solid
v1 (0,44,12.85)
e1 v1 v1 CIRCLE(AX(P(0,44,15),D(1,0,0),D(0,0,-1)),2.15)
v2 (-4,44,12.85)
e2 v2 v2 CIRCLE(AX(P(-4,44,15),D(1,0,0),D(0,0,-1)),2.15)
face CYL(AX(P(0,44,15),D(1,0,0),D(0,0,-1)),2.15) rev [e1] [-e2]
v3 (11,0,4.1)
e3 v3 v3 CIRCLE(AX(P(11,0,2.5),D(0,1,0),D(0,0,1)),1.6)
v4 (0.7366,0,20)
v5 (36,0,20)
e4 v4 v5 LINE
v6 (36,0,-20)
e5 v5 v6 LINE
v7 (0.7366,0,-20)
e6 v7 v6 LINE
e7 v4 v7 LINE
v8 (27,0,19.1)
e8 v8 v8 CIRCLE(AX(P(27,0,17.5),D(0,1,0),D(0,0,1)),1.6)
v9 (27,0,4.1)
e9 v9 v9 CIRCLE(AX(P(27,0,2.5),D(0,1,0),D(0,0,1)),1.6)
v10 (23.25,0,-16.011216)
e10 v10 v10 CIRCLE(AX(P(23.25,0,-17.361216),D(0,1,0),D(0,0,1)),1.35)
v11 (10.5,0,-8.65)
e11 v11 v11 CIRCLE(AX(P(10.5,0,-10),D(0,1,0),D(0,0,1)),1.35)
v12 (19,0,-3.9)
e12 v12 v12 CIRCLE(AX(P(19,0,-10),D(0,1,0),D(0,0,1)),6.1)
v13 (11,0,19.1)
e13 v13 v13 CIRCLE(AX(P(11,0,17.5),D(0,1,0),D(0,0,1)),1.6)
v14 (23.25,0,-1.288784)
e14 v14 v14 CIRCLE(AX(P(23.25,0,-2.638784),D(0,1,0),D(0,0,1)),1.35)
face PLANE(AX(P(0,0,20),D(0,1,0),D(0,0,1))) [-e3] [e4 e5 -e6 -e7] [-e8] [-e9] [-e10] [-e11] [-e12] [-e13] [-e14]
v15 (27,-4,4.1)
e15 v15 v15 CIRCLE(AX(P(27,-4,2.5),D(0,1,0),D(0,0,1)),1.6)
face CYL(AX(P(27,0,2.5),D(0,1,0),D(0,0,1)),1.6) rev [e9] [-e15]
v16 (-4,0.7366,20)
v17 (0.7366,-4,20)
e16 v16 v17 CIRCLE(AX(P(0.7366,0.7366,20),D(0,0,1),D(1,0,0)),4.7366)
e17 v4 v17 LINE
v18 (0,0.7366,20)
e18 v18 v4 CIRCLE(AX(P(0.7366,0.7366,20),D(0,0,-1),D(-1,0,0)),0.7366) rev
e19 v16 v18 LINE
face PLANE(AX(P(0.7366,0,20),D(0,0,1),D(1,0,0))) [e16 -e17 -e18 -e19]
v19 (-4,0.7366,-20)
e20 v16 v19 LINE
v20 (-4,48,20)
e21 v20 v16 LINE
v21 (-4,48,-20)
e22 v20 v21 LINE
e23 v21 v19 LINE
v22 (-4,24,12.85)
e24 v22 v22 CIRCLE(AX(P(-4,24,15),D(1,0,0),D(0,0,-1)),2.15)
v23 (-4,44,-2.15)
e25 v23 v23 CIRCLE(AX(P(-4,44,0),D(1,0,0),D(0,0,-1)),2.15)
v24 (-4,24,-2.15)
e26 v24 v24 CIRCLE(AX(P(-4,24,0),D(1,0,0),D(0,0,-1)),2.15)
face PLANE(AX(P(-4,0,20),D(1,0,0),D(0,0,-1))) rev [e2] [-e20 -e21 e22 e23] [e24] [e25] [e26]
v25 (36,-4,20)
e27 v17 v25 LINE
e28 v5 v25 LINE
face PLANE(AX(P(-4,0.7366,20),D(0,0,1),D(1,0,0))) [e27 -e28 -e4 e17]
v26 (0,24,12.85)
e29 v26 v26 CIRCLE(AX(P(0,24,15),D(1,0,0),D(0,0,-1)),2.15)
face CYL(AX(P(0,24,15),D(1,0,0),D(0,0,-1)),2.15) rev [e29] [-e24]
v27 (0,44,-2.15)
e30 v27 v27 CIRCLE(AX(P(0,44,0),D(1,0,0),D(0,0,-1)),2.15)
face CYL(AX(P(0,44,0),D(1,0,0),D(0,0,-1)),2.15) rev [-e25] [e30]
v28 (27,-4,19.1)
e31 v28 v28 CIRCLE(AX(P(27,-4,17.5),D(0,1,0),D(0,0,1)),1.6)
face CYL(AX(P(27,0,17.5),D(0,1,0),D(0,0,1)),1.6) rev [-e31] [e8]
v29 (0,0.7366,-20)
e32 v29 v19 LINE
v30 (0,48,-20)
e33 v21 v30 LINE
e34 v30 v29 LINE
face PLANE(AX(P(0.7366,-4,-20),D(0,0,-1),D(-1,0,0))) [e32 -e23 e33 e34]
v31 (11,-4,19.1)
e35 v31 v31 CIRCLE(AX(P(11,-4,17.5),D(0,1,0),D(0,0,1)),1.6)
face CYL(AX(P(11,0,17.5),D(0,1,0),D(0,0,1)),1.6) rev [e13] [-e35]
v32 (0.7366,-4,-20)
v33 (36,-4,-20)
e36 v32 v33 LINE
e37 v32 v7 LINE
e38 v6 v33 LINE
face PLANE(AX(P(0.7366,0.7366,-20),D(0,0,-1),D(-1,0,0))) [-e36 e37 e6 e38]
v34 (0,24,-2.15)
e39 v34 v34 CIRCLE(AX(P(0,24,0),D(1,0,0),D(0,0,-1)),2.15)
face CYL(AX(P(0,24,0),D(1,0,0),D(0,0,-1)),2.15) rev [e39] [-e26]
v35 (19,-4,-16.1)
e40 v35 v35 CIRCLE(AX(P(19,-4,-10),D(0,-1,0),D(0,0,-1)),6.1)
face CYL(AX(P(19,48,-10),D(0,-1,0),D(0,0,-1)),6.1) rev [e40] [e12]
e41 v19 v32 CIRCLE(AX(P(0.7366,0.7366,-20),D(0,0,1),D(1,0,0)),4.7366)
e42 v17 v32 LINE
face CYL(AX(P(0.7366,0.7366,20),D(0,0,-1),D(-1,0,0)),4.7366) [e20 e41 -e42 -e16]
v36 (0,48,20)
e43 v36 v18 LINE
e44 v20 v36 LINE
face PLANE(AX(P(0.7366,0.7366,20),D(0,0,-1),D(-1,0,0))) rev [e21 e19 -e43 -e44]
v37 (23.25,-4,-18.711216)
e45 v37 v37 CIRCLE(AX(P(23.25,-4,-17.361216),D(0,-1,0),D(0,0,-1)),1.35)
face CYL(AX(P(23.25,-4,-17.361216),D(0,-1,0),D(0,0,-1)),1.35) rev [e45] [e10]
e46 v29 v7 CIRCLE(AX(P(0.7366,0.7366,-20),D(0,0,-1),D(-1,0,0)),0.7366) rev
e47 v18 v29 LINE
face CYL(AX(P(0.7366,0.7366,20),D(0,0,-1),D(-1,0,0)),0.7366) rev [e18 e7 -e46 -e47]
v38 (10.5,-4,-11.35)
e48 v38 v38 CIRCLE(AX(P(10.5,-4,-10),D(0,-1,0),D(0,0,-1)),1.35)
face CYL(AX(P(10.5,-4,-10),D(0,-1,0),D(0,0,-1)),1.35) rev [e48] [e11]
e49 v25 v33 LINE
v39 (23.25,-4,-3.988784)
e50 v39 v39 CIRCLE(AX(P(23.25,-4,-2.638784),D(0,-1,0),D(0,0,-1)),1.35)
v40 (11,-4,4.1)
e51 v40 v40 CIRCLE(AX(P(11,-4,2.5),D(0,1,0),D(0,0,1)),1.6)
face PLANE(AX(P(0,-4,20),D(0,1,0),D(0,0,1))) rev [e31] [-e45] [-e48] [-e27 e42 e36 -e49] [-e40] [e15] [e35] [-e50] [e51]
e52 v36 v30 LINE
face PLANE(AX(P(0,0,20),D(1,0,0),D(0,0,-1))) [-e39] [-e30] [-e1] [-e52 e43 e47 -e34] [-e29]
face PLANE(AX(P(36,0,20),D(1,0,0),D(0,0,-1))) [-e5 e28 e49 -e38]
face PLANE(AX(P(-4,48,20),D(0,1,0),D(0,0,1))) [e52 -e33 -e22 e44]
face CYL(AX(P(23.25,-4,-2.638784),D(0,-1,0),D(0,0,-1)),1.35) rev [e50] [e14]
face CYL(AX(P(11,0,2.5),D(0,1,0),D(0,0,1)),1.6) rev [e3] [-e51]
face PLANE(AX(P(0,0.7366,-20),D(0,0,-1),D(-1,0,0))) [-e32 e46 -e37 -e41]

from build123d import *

# Parameters (mm, degrees)
SM_BASE_FLANGE_2_DEPTH   = 20
HOLE_WIZARD_M3_1_D       = 3.2
SKETCH_24_R              = 6.1
CUT_EXTRUDE_2_DEPTH      = 67.332495807
HOLE_WIZARD_M4_1_D       = 4.3
HOLE_WIZARD_M2_5_1_D     = 2.7
PATTERN_CIRCULAR_1_COUNT = 3


# Sheet-metal steps are written as plain solids
with BuildPart() as part:
    # 草圖16 → 基材-凸緣2 (new, symmetric)
    with BuildSketch(Plane.XY):
        with BuildLine():
            Line((36, 0), (0.7366, 0))
            ThreePointArc((0.7366, 0), (0.215745145, 0.215745145), (0, 0.7366))
            Line((0, 0.7366), (0, 48))
            Line((0, 48), (-4, 48))
            Line((-4, 48), (-4, 0.7366))
            ThreePointArc((-4, 0.7366), (-2.61268198, -2.61268198), (0.7366, -4))
            Line((0.7366, -4), (36, -4))
            Line((36, -4), (36, 0))
        make_face()
    extrude(amount=SM_BASE_FLANGE_2_DEPTH, both=True)

    # M3 餘隙孔1 (through all)
    with Locations(Plane(origin=(0, 0, 0), x_dir=(-1, 0, 0), z_dir=(0, 1, 0))):
        with Locations((-27, 17.5), (-11, 2.5), (-11, 17.5), (-27, 2.5)):
            Hole(HOLE_WIZARD_M3_1_D / 2)

    # 草圖24 → 除料-伸長2 (cut, through all)
    with BuildSketch(Plane.XZ.offset(4)):
        with Locations(Location((19, -10, 0), (0, 0, 270))):
            Circle(SKETCH_24_R)
    extrude(amount=-CUT_EXTRUDE_2_DEPTH, mode=Mode.SUBTRACT)

    # M4 餘隙孔1 (through all)
    with Locations(Plane(origin=(0, 0, 0), x_dir=(0, 0, 1), z_dir=(1, 0, 0))):
        with Locations((0, -44), (15, -44), (15, -24), (0, -24)):
            Hole(HOLE_WIZARD_M4_1_D / 2)

    # M2.5 餘隙孔1 (through all)
    with Locations(Plane(origin=(0, -4, 0), x_dir=(-1, 0, 0), z_dir=(0, -1, 0))):
        with Locations((-10.5, 10)):
            hole_wizard_m2_5_1 = Hole(HOLE_WIZARD_M2_5_1_D / 2)

    # 環狀複製排列1: M2.5 餘隙孔1 ×3 about axis
    pattern_circular_1_axis = Axis((19, 0, -10), (0, 1, 0))
    for i in range(1, PATTERN_CIRCULAR_1_COUNT):
        add(hole_wizard_m2_5_1.rotate(pattern_circular_1_axis, i * 360 / PATTERN_CIRCULAR_1_COUNT), mode=Mode.SUBTRACT)


solid = part.part
